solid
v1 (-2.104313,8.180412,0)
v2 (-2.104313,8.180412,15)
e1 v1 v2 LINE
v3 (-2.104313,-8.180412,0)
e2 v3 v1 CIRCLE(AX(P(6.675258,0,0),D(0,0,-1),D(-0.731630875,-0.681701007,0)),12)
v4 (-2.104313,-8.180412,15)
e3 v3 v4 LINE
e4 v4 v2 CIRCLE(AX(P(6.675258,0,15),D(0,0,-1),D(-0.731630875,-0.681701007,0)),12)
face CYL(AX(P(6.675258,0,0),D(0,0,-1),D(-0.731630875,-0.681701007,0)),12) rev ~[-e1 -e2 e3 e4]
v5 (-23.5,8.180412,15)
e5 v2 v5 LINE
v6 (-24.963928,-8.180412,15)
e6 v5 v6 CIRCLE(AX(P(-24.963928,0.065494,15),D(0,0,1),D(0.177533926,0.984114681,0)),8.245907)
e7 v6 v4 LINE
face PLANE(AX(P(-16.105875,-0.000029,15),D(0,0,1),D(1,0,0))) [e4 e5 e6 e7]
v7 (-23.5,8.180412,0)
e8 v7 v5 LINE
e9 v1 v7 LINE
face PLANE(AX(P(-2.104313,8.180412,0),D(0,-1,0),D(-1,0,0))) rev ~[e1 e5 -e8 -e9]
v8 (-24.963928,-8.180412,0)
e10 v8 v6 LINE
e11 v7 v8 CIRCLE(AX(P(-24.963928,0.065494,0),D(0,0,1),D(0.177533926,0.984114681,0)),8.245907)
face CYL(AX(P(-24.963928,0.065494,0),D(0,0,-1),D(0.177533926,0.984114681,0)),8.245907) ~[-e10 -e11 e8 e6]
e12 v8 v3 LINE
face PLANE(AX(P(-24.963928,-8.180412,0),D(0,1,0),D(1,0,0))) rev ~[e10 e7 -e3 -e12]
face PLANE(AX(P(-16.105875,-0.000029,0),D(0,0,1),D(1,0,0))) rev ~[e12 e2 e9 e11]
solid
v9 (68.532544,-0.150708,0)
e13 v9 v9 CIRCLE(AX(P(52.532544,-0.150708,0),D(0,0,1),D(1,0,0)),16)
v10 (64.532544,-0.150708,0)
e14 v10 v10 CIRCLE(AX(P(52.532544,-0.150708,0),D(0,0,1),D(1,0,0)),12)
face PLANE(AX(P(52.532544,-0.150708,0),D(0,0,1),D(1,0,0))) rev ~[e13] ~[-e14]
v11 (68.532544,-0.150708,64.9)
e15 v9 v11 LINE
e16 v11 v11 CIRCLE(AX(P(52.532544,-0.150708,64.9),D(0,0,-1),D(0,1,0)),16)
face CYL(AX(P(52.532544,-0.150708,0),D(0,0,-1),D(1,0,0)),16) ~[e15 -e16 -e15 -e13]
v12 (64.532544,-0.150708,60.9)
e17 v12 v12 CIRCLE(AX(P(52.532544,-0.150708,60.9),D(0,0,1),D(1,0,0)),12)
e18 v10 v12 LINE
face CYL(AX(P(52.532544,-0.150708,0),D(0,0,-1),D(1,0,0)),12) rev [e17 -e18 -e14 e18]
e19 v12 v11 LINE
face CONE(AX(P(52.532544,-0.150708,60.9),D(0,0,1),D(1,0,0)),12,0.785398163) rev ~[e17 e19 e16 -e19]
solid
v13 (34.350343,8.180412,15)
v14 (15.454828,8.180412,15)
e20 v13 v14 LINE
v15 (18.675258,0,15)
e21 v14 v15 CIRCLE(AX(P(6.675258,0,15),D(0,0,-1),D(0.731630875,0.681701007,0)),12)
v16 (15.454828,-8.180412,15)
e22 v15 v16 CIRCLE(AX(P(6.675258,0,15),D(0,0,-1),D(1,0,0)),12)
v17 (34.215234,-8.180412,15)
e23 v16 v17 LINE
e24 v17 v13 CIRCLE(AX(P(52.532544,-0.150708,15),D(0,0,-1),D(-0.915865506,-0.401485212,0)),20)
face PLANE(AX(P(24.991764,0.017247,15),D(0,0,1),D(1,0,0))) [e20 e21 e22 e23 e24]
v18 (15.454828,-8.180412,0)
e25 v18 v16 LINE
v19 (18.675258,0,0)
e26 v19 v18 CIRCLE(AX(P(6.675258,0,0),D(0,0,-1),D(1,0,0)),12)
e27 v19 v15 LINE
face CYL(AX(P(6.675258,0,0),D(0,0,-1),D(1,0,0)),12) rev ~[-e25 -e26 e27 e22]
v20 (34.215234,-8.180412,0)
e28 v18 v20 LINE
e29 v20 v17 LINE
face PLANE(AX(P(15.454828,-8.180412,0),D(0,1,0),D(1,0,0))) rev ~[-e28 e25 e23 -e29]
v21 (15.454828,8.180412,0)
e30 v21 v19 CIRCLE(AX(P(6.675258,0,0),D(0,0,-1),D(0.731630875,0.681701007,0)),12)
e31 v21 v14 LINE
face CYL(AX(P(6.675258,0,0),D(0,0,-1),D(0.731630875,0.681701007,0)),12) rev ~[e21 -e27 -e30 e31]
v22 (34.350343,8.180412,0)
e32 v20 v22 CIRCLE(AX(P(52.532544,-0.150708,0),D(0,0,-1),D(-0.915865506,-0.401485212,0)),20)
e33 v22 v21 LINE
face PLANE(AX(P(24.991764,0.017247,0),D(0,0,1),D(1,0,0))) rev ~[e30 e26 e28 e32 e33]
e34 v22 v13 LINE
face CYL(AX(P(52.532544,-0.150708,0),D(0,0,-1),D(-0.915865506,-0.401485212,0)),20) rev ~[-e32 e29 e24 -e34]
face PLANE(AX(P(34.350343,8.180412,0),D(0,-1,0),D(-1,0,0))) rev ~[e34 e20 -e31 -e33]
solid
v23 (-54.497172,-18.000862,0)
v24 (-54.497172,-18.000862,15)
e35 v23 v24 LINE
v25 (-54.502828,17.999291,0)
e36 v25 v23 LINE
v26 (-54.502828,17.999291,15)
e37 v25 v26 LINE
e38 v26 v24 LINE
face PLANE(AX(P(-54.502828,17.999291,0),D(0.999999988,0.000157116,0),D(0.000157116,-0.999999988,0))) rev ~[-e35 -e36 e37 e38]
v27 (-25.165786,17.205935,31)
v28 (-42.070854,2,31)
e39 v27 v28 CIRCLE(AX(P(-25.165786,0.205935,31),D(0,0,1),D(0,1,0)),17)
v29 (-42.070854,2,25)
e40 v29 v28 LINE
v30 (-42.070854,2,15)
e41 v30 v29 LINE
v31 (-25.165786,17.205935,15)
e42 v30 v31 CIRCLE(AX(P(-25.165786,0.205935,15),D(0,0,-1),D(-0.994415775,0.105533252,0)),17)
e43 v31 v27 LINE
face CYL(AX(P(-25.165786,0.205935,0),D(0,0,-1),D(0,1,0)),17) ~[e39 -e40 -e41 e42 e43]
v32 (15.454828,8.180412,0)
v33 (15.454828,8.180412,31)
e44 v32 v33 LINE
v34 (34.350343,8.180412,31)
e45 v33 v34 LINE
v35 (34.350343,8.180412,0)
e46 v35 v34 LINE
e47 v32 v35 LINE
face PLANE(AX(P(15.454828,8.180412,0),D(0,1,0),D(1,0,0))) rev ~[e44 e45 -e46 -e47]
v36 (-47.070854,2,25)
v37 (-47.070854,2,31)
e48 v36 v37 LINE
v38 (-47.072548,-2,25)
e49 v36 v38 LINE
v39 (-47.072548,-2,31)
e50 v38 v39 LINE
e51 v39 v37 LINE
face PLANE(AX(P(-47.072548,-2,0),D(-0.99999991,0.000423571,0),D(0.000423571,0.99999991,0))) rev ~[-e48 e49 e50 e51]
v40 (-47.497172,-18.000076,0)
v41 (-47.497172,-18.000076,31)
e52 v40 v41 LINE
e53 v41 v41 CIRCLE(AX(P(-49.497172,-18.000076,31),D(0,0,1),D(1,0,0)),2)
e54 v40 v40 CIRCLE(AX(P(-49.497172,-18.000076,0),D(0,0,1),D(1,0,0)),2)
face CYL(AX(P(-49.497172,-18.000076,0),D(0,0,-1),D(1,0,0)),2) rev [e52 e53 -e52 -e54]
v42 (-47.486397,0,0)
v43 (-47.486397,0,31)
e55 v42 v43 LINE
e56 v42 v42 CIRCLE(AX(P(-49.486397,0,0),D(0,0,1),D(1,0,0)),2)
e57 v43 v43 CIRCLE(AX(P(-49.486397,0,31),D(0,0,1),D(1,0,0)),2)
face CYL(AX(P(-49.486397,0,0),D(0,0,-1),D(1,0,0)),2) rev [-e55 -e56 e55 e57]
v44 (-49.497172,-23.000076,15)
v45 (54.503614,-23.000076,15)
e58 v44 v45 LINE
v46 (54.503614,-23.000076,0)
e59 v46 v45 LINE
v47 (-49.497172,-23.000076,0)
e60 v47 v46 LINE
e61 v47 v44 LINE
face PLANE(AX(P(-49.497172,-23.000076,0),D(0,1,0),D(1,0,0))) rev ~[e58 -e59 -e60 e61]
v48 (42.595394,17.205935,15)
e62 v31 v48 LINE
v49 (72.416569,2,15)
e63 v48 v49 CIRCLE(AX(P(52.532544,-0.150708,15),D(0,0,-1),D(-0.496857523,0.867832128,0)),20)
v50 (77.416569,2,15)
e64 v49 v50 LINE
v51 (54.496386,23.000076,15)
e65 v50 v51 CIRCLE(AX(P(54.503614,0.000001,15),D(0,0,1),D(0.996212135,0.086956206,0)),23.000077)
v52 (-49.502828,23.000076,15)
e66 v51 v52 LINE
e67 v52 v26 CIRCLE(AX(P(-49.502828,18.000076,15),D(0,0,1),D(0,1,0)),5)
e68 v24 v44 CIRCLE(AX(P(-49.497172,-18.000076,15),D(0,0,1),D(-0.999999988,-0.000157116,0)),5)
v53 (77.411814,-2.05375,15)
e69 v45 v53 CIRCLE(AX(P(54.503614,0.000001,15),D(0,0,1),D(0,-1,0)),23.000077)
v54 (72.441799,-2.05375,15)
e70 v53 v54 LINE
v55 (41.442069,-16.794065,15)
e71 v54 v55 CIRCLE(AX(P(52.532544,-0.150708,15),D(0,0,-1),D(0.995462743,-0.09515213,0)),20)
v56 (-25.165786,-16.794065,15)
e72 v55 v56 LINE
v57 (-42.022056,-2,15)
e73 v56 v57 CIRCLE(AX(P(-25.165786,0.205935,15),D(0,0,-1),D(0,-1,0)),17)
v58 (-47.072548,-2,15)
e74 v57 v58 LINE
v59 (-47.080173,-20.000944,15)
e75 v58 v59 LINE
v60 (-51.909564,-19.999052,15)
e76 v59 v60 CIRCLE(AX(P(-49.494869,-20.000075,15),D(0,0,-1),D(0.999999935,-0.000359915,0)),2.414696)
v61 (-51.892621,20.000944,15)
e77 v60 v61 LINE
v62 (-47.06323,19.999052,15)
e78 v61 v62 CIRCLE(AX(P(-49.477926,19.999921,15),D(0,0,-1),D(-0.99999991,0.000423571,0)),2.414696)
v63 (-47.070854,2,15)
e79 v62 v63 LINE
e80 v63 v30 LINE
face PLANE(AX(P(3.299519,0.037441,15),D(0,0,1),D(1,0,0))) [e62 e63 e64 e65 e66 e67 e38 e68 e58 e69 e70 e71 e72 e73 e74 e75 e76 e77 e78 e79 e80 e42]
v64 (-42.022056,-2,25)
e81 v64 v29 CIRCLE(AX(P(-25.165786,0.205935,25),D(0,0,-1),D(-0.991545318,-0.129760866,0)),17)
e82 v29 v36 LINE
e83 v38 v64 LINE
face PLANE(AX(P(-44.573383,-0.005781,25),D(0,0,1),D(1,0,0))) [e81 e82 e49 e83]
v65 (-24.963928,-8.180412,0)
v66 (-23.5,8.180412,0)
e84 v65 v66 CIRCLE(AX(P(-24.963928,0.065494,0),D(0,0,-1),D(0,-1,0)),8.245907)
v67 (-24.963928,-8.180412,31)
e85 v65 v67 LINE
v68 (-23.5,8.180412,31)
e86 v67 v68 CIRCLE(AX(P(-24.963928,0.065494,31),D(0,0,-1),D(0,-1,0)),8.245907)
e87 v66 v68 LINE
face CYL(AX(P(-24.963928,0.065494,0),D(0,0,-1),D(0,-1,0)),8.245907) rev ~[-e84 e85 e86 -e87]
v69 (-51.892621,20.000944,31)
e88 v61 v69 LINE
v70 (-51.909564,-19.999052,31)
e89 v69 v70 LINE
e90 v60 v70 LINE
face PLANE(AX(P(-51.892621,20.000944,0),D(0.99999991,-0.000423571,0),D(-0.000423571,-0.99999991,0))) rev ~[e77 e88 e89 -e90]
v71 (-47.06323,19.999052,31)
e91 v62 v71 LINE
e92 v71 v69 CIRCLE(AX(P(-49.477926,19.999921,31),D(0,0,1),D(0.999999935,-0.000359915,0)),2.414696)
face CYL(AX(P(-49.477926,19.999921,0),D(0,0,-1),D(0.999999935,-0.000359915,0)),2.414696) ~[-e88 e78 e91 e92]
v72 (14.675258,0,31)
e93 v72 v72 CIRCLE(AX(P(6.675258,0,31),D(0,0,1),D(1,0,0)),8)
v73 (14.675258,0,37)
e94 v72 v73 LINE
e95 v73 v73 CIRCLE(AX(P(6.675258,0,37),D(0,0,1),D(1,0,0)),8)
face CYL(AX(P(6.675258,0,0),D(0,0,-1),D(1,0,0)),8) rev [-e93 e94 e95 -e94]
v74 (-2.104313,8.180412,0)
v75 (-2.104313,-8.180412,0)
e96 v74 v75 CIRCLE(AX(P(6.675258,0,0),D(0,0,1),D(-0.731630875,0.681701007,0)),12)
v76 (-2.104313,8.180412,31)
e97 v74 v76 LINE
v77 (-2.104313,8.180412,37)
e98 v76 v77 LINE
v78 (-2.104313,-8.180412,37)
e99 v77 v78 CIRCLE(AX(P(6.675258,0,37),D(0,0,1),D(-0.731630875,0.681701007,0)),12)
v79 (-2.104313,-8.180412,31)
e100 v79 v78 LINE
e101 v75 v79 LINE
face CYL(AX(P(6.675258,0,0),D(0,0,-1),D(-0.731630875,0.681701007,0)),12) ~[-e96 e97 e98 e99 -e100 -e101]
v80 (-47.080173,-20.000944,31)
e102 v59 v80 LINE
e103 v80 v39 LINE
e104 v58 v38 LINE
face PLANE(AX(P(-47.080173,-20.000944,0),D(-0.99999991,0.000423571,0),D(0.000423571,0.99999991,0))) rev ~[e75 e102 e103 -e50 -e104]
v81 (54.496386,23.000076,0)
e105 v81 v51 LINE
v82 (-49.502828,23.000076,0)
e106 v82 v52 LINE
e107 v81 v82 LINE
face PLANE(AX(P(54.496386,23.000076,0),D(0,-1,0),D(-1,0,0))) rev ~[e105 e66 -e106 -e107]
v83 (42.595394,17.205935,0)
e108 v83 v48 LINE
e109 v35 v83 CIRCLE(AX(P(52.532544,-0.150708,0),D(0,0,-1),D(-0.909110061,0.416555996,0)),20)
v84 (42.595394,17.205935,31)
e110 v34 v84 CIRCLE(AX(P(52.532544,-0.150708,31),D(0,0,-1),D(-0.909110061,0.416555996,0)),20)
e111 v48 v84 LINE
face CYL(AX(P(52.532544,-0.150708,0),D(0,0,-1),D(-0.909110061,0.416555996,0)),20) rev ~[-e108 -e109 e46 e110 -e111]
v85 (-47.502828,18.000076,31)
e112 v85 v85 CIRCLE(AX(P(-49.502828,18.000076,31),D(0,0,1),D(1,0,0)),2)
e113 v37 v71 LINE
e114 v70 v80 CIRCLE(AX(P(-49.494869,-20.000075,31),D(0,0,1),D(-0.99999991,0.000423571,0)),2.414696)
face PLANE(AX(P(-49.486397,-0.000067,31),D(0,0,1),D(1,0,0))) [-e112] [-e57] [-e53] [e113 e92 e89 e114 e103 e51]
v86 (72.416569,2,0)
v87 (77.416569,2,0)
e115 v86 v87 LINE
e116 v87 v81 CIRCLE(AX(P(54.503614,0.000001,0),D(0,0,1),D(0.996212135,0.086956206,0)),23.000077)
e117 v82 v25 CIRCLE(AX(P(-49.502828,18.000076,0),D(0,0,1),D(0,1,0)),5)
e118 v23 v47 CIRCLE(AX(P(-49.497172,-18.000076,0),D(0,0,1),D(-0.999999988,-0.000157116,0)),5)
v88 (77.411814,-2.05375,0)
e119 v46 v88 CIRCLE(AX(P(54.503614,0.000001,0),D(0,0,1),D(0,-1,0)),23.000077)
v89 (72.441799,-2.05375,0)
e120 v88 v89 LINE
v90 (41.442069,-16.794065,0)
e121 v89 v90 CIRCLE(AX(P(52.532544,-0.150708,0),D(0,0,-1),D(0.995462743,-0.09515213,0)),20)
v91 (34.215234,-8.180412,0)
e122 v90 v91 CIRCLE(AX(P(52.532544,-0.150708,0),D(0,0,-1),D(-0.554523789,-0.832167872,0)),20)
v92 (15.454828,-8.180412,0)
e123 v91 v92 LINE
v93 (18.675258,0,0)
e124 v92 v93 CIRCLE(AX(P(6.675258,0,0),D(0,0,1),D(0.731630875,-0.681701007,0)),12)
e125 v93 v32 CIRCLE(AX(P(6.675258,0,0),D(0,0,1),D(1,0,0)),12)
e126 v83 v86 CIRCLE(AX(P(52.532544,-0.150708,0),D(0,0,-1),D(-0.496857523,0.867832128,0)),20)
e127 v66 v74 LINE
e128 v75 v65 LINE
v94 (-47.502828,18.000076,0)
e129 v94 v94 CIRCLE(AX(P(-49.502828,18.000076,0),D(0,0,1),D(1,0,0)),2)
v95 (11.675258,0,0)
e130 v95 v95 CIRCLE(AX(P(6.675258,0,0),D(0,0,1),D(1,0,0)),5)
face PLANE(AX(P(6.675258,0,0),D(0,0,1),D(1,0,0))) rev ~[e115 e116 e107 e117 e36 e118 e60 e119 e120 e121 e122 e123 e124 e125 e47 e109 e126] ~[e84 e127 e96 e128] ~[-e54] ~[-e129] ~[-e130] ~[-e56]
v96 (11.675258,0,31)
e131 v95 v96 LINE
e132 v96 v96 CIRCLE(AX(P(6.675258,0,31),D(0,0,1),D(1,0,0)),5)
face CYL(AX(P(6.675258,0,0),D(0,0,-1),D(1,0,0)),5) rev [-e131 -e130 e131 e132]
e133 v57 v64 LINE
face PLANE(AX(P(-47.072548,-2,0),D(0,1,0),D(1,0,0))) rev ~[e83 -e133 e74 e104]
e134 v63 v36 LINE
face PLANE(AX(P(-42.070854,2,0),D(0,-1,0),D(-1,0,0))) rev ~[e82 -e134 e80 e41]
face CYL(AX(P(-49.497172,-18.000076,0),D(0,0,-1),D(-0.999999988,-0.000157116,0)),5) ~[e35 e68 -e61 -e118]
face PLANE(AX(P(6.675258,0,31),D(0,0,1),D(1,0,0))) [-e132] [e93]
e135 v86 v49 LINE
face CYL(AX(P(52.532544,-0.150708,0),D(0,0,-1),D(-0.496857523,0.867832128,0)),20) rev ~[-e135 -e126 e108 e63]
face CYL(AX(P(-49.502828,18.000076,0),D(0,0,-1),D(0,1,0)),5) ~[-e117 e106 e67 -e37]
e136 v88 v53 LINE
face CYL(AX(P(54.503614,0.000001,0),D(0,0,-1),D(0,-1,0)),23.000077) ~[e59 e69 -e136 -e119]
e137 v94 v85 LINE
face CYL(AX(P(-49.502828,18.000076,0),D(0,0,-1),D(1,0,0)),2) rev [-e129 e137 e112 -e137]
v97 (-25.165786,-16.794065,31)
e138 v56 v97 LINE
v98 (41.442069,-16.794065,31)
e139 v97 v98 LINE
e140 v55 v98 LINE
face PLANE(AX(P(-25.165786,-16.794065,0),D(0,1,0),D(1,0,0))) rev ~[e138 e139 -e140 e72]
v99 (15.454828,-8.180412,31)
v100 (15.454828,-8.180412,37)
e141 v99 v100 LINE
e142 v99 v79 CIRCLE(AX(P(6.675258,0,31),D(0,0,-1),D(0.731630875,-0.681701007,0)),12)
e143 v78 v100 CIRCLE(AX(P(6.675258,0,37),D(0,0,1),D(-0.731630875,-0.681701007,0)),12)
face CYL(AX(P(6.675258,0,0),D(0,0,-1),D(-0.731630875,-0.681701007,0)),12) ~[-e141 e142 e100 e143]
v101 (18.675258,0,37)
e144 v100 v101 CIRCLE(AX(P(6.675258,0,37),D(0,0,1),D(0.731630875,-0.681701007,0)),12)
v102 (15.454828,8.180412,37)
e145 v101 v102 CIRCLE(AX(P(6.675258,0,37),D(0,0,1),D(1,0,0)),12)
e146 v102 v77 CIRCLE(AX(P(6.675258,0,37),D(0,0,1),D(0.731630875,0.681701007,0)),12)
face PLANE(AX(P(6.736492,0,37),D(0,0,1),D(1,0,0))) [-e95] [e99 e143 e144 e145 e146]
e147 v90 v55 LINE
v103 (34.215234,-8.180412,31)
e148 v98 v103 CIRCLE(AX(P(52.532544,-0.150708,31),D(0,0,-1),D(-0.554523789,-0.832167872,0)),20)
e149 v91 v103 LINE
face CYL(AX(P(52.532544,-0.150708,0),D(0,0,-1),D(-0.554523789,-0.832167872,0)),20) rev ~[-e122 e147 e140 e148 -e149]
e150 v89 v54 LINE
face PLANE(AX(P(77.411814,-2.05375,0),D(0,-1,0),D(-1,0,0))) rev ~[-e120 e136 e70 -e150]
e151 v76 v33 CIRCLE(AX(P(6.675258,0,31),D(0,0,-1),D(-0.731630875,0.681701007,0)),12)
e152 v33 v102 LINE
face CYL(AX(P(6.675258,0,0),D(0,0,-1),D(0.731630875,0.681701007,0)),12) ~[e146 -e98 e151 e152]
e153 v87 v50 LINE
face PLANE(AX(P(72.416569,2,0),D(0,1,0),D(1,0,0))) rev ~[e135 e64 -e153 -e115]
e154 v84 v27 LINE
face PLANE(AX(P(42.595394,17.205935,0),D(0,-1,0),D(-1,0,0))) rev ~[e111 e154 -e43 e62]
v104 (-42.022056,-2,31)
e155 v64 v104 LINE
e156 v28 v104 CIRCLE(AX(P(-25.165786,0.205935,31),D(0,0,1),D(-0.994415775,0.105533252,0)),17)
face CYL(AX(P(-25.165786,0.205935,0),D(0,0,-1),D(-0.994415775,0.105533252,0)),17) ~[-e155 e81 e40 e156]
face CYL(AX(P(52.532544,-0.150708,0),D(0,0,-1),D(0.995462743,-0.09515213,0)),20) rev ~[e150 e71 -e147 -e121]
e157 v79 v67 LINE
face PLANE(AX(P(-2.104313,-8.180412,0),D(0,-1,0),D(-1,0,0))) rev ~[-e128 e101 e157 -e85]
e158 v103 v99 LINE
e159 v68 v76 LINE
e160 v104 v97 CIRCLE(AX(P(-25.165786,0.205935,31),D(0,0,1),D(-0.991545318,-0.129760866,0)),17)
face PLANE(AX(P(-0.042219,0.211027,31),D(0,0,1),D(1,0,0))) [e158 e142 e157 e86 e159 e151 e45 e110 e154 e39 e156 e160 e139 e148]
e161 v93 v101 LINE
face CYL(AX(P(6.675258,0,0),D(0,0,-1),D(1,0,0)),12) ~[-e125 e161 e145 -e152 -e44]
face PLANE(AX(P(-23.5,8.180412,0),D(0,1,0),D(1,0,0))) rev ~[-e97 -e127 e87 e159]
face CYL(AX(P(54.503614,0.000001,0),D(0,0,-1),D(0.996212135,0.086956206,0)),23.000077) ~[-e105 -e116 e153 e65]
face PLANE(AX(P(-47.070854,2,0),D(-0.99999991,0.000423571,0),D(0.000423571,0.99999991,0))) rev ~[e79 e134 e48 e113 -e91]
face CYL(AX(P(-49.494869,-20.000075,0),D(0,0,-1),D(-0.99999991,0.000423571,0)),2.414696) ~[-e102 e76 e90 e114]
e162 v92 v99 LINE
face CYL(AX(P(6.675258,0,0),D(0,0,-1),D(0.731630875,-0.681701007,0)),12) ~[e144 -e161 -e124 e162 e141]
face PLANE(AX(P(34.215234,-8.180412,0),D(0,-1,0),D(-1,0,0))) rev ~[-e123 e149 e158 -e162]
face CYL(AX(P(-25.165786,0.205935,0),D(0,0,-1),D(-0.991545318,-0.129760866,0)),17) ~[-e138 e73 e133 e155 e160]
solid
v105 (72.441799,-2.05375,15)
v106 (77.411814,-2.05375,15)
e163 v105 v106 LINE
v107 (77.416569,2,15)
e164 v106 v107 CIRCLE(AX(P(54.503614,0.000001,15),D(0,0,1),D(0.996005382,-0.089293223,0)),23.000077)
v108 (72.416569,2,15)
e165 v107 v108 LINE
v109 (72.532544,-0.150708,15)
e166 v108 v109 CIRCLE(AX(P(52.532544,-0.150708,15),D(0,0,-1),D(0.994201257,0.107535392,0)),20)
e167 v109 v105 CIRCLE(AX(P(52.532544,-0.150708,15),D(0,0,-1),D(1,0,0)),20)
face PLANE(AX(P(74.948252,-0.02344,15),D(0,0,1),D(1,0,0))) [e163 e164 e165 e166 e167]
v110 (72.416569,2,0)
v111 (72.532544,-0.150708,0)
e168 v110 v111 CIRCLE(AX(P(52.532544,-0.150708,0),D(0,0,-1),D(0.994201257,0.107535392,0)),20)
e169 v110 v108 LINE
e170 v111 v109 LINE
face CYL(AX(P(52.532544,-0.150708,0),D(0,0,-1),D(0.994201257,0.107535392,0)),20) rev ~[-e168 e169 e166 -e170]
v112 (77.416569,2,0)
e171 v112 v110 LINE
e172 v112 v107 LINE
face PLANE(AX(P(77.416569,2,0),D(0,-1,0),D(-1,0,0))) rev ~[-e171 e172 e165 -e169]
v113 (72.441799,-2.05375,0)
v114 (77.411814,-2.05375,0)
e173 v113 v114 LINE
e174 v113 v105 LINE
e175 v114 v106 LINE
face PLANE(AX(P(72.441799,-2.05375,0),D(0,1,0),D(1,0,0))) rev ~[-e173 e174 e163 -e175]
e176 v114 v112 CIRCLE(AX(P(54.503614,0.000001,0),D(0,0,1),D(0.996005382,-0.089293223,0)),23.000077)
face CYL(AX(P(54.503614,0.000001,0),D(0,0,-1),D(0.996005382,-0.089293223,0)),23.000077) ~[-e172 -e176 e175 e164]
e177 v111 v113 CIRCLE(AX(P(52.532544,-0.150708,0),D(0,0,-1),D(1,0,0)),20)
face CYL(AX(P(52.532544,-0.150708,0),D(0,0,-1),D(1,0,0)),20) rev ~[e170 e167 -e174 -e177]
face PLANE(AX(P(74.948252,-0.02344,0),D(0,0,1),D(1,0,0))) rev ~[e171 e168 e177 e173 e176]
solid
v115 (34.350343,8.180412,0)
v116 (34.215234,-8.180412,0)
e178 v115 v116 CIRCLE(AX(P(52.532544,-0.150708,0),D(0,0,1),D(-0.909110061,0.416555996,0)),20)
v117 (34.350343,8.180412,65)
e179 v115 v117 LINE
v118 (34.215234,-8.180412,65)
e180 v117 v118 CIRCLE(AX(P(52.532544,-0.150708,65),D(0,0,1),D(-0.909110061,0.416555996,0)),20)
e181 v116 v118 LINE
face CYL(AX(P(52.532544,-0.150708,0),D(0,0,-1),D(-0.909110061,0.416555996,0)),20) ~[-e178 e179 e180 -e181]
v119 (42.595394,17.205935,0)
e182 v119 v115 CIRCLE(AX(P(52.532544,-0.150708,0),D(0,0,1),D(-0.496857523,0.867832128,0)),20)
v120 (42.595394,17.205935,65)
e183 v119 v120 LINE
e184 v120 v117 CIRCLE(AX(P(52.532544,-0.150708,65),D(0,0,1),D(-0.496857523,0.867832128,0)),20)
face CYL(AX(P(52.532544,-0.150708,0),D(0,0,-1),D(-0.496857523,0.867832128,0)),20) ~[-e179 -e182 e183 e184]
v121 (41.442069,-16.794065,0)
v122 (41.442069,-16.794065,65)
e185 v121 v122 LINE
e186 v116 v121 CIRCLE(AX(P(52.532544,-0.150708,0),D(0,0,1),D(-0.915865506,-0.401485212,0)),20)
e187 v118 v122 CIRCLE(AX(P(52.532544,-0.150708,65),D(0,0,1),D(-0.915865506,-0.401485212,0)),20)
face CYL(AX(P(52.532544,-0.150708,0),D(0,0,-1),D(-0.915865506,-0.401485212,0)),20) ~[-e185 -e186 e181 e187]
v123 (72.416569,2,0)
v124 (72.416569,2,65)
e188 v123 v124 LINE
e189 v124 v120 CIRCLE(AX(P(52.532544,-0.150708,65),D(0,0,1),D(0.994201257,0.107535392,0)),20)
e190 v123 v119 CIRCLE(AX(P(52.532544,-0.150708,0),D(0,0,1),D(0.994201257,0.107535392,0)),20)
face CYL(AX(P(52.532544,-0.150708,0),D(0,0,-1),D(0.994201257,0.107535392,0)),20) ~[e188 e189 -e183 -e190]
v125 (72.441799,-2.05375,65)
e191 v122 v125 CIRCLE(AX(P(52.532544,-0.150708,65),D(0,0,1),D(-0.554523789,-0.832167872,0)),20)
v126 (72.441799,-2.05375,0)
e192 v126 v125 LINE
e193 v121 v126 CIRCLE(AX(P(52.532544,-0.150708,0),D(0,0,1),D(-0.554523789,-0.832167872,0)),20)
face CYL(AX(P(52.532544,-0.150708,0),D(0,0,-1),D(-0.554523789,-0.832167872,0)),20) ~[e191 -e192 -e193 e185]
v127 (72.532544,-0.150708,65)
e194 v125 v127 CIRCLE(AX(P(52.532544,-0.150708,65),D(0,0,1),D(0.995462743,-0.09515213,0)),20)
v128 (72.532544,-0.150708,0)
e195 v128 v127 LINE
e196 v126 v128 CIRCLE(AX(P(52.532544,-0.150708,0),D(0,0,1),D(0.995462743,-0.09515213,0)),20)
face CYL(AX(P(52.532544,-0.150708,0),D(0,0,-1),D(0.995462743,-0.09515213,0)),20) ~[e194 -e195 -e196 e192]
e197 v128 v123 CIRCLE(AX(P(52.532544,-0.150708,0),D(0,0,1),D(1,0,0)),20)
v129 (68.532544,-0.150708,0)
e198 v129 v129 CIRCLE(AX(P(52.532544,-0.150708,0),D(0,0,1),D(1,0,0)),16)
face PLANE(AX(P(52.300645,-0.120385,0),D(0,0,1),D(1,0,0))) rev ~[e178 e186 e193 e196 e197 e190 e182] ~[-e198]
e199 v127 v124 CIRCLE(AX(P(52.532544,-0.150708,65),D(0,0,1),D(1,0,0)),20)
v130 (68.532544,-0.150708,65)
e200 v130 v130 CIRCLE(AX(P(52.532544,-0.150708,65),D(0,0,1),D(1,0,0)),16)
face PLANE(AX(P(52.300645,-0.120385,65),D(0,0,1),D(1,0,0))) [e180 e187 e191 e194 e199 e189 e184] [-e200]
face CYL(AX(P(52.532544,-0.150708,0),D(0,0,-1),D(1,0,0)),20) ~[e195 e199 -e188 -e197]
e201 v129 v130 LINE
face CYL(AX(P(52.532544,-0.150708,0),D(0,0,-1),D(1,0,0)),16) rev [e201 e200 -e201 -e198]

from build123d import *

# Parameters (mm, degrees)
F1_DEPTH  = 15
F0_R      = 2
F2_DEPTH  = 31
F3_DEPTH  = 25
F4_DEPTH  = 31
F0_R_2    = 8
F5_DEPTH  = 37
F0_R_3    = 5
F6_DEPTH  = 31
F0_R_4    = 16
F0_R_5    = 12
F7_DEPTH  = 65
F8_DEPTH  = 65
F10_DEPTH = 15
F11_DEPTH = 15


# Not quite as in the source:
# - a fillet or chamfer that OpenCascade refuses, or shapes differently, is made with other operations: its cross-section is extruded or revolved along the edge and cut away or added
# - a feature names something its author has since deleted; it is built from what else it names


with BuildPart() as f1:
    # F0 (on Top) → F1 (new body)
    with BuildSketch(Plane.XY):
        with BuildLine():
            ThreePointArc((77.4165694517, 2), (70.0412743977, 16.9583212199), (54.4963863199, 23.0000763868))
            Line((54.4963863199, 23.0000763868), (-49.5028280384, 23.0000763868))
            ThreePointArc((-49.5028280384, 23.0000763868), (-53.0386396779, 21.5353325374), (-54.5028279767, 17.9992908068))
            Line((-54.5028279767, 17.9992908068), (-54.4971717765, -18.0008619668))
            ThreePointArc((-54.4971717765, -18.0008619668), (-53.0324279887, -21.5358880263), (-49.4971718382, -23.0000763868))
            Line((-49.4971718382, -23.0000763868), (54.5036136801, -23.0000763868))
            ThreePointArc((54.5036136801, -23.0000763868), (70.024037462, -16.9740969207), (77.4118141054, -2.0537504379))
            Line((77.4118141054, -2.0537504379), (72.4417991653, -2.0537504379))
            ThreePointArc((72.4417991653, -2.0537504379), (61.1210212719, -18.2127692775), (41.4420685321, -16.7940652806))
            Line((41.4420685321, -16.7940652806), (-25.1657858694, -16.7940652806))
            ThreePointArc((-25.1657858694, -16.7940652806), (-36.3795967687, -12.5710150384), (-42.0220562758, -2))
            Line((-42.0220562758, -2), (-47.0725483227, -2))
            Line((-47.0725483227, -2), (-47.0801730056, -20.0009441468))
            ThreePointArc((-47.0801730056, -20.0009441468), (-49.4958146373, -22.4147707226), (-51.9095643269, -19.999052265))
            Line((-51.9095643269, -19.999052265), (-51.8926214772, 20.0009441468))
            ThreePointArc((-51.8926214772, 20.0009441468), (-49.4769799058, 22.4146170129), (-47.0632301559, 19.999052265))
            Line((-47.0632301559, 19.999052265), (-47.0708540375, 2))
            Line((-47.0708540375, 2), (-42.0708540375, 2))
            ThreePointArc((-42.0708540375, 2), (-36.5346224464, 12.8451417707), (-25.1657858694, 17.2059347194))
            Line((-25.1657858694, 17.2059347194), (42.5953938554, 17.2059347194))
            ThreePointArc((42.5953938554, 17.2059347194), (61.6177075826, 17.6666940031), (72.4165694517, 2))
            Line((72.4165694517, 2), (77.4165694517, 2))
        make_face()
    extrude(amount=F1_DEPTH)

    # F0 (on Top) → F2 (join)
    with BuildSketch(Plane.XY):
        with BuildLine():
            Line((-47.0725483227, -2), (-47.0708540375, 2))
            Line((-47.0708540375, 2), (-47.0632301559, 19.999052265))
            ThreePointArc((-47.0632301559, 19.999052265), (-49.4769799058, 22.4146170129), (-51.8926214772, 20.0009441468))
            Line((-51.8926214772, 20.0009441468), (-51.9095643269, -19.999052265))
            ThreePointArc((-51.9095643269, -19.999052265), (-49.4958146373, -22.4147707226), (-47.0801730056, -20.0009441468))
            Line((-47.0801730056, -20.0009441468), (-47.0725483227, -2))
        make_face()
        with Locations((-49.4971718382, -18.0000763868)):
            Circle(F0_R, mode=Mode.SUBTRACT)
        with Locations((-49.4863972414, 0)):
            Circle(F0_R, mode=Mode.SUBTRACT)
        with Locations((-49.5028280384, 18.0000763868)):
            Circle(F0_R, mode=Mode.SUBTRACT)
    extrude(amount=F2_DEPTH)

    # F0 (on Top) → F3 (join)
    with BuildSketch(Plane.XY):
        with BuildLine():
            ThreePointArc((-42.0220562758, -2), (-42.1645209866, -0.0014403371), (-42.0708540375, 2))
            Line((-42.0708540375, 2), (-47.0708540375, 2))
            Line((-47.0708540375, 2), (-47.0725483227, -2))
            Line((-47.0725483227, -2), (-42.0220562758, -2))
        make_face()
    extrude(amount=F3_DEPTH)

    # F0 (on Top) → F4 (join)
    with BuildSketch(Plane.XY):
        with BuildLine():
            ThreePointArc((34.3503431001, 8.1804120839), (37.766383698, 13.3385657076), (42.5953938554, 17.2059347194))
            Line((42.5953938554, 17.2059347194), (-25.1657858694, 17.2059347194))
            ThreePointArc((-25.1657858694, 17.2059347194), (-36.5346224464, 12.8451417707), (-42.0708540375, 2))
            ThreePointArc((-42.0708540375, 2), (-42.1645209866, -0.0014403371), (-42.0220562758, -2))
            ThreePointArc((-42.0220562758, -2), (-36.3795967687, -12.5710150384), (-25.1657858694, -16.7940652806))
            Line((-25.1657858694, -16.7940652806), (41.4420685321, -16.7940652806))
            ThreePointArc((41.4420685321, -16.7940652806), (37.2108856838, -13.0055426049), (34.2152341998, -8.1804120839))
            Line((34.2152341998, -8.1804120839), (15.4548283117, -8.1804120839))
            ThreePointArc((15.4548283117, -8.1804120839), (6.6752578132, -12), (-2.1043126853, -8.1804120839))
            Line((-2.1043126853, -8.1804120839), (-24.9639281544, -8.1804120839))
            ThreePointArc((-24.9639281544, -8.1804120839), (-33.1770221677, 0.8003828075), (-23.5, 8.1804120839))
            Line((-23.5, 8.1804120839), (-2.1043126853, 8.1804120839))
            ThreePointArc((-2.1043126853, 8.1804120839), (6.6752578132, 12), (15.4548283117, 8.1804120839))
            Line((15.4548283117, 8.1804120839), (34.3503431001, 8.1804120839))
        make_face()
    extrude(amount=F4_DEPTH)

    # F0 (on Top) → F5 (join)
    with BuildSketch(Plane.XY):
        with BuildLine():
            ThreePointArc((18.6752578132, 0), (17.8411622992, 4.3957453303), (15.4548283117, 8.1804120839))
            ThreePointArc((15.4548283117, 8.1804120839), (6.6752578132, 12), (-2.1043126853, 8.1804120839))
            ThreePointArc((-2.1043126853, 8.1804120839), (-5.3247421868, 0), (-2.1043126853, -8.1804120839))
            ThreePointArc((-2.1043126853, -8.1804120839), (6.6752578132, -12), (15.4548283117, -8.1804120839))
            ThreePointArc((15.4548283117, -8.1804120839), (17.8411622992, -4.3957453303), (18.6752578132, 0))
        make_face()
        with Locations((6.6752578132, 0)):
            Circle(F0_R_2, mode=Mode.SUBTRACT)
    extrude(amount=F5_DEPTH)

    # F0 (on Top) → F6 (join)
    with BuildSketch(Plane.XY):
        with Locations((6.6752578132, 0)):
            Circle(F0_R_2)
        with Locations((6.6752578132, 0)):
            Circle(F0_R_3, mode=Mode.SUBTRACT)
    extrude(amount=F6_DEPTH)


with BuildPart() as f7:
    # F0 (on Top) → F7 (new body)
    with BuildSketch(Plane.XY):
        with Locations((52.5325443108, -0.1507078368)):
            Circle(F0_R_4)
        with Locations((52.5325443108, -0.1507078368)):
            Circle(F0_R_5, mode=Mode.SUBTRACT)
    extrude(amount=F7_DEPTH)

    # F9: chamfer of 4.1 on 1 edges, made by hand

    # F9_s1 → F9_t2 (revolve, cut)
    with BuildSketch(Plane.XZ.offset(0.1507078368)):
        Polygon((64.5325443108, 60.9), (68.6325443108, 65), (64.5325443108, 65), align=None)
    revolve(axis=Axis((52.5325443108, -0.1507078368, 65), (0, 0, 1)), mode=Mode.SUBTRACT)


with BuildPart() as f8:
    # F0 (on Top) → F8 (new body)
    with BuildSketch(Plane.XY):
        with BuildLine():
            ThreePointArc((72.5325443108, -0.1507078368), (72.5035295496, 0.926208405), (72.4165694517, 2))
            ThreePointArc((72.4165694517, 2), (61.6177075826, 17.6666940031), (42.5953938554, 17.2059347194))
            ThreePointArc((42.5953938554, 17.2059347194), (37.766383698, 13.3385657076), (34.3503431001, 8.1804120839))
            ThreePointArc((34.3503431001, 8.1804120839), (32.5332262339, 0.0144480163), (34.2152341998, -8.1804120839))
            ThreePointArc((34.2152341998, -8.1804120839), (37.2108856838, -13.0055426049), (41.4420685321, -16.7940652806))
            ThreePointArc((41.4420685321, -16.7940652806), (61.1210212719, -18.2127692775), (72.4417991653, -2.0537504379))
            ThreePointArc((72.4417991653, -2.0537504379), (72.5098451431, -1.1033103015), (72.5325443108, -0.1507078368))
        make_face()
        with Locations((52.5325443108, -0.1507078368)):
            Circle(F0_R_4, mode=Mode.SUBTRACT)
    extrude(amount=F8_DEPTH)


with BuildPart() as f10:
    # F0 (on Top) → F10 (new body)
    with BuildSketch(Plane.XY):
        with BuildLine():
            ThreePointArc((-2.1043126853, -8.1804120839), (-5.3247421868, 0), (-2.1043126853, 8.1804120839))
            Line((-2.1043126853, 8.1804120839), (-23.5, 8.1804120839))
            ThreePointArc((-23.5, 8.1804120839), (-33.1770221677, 0.8003828075), (-24.9639281544, -8.1804120839))
            Line((-24.9639281544, -8.1804120839), (-2.1043126853, -8.1804120839))
        make_face()
    extrude(amount=F10_DEPTH)


with BuildPart() as f10b:
    # F0 (on Top) → F10, piece 2 (new body)
    with BuildSketch(Plane.XY):
        with BuildLine():
            ThreePointArc((34.2152341998, -8.1804120839), (32.5332262339, 0.0144480163), (34.3503431001, 8.1804120839))
            Line((34.3503431001, 8.1804120839), (15.4548283117, 8.1804120839))
            ThreePointArc((15.4548283117, 8.1804120839), (17.8411622992, 4.3957453303), (18.6752578132, 0))
            ThreePointArc((18.6752578132, 0), (17.8411622992, -4.3957453303), (15.4548283117, -8.1804120839))
            Line((15.4548283117, -8.1804120839), (34.2152341998, -8.1804120839))
        make_face()
    extrude(amount=F10_DEPTH)


with BuildPart() as f11:
    # F0 (on Top) → F11 (new body)
    with BuildSketch(Plane.XY):
        with BuildLine():
            ThreePointArc((77.4118141054, -2.0537504379), (77.5036748095, -0.0269801891), (77.4165694517, 2))
            Line((77.4165694517, 2), (72.4165694517, 2))
            ThreePointArc((72.4165694517, 2), (72.5035295496, 0.926208405), (72.5325443108, -0.1507078368))
            ThreePointArc((72.5325443108, -0.1507078368), (72.5098451431, -1.1033103015), (72.4417991653, -2.0537504379))
            Line((72.4417991653, -2.0537504379), (77.4118141054, -2.0537504379))
        make_face()
    extrude(amount=F11_DEPTH)


solid = Compound([f1.part, f7.part, f8.part, f10.part, f10b.part, f11.part])
